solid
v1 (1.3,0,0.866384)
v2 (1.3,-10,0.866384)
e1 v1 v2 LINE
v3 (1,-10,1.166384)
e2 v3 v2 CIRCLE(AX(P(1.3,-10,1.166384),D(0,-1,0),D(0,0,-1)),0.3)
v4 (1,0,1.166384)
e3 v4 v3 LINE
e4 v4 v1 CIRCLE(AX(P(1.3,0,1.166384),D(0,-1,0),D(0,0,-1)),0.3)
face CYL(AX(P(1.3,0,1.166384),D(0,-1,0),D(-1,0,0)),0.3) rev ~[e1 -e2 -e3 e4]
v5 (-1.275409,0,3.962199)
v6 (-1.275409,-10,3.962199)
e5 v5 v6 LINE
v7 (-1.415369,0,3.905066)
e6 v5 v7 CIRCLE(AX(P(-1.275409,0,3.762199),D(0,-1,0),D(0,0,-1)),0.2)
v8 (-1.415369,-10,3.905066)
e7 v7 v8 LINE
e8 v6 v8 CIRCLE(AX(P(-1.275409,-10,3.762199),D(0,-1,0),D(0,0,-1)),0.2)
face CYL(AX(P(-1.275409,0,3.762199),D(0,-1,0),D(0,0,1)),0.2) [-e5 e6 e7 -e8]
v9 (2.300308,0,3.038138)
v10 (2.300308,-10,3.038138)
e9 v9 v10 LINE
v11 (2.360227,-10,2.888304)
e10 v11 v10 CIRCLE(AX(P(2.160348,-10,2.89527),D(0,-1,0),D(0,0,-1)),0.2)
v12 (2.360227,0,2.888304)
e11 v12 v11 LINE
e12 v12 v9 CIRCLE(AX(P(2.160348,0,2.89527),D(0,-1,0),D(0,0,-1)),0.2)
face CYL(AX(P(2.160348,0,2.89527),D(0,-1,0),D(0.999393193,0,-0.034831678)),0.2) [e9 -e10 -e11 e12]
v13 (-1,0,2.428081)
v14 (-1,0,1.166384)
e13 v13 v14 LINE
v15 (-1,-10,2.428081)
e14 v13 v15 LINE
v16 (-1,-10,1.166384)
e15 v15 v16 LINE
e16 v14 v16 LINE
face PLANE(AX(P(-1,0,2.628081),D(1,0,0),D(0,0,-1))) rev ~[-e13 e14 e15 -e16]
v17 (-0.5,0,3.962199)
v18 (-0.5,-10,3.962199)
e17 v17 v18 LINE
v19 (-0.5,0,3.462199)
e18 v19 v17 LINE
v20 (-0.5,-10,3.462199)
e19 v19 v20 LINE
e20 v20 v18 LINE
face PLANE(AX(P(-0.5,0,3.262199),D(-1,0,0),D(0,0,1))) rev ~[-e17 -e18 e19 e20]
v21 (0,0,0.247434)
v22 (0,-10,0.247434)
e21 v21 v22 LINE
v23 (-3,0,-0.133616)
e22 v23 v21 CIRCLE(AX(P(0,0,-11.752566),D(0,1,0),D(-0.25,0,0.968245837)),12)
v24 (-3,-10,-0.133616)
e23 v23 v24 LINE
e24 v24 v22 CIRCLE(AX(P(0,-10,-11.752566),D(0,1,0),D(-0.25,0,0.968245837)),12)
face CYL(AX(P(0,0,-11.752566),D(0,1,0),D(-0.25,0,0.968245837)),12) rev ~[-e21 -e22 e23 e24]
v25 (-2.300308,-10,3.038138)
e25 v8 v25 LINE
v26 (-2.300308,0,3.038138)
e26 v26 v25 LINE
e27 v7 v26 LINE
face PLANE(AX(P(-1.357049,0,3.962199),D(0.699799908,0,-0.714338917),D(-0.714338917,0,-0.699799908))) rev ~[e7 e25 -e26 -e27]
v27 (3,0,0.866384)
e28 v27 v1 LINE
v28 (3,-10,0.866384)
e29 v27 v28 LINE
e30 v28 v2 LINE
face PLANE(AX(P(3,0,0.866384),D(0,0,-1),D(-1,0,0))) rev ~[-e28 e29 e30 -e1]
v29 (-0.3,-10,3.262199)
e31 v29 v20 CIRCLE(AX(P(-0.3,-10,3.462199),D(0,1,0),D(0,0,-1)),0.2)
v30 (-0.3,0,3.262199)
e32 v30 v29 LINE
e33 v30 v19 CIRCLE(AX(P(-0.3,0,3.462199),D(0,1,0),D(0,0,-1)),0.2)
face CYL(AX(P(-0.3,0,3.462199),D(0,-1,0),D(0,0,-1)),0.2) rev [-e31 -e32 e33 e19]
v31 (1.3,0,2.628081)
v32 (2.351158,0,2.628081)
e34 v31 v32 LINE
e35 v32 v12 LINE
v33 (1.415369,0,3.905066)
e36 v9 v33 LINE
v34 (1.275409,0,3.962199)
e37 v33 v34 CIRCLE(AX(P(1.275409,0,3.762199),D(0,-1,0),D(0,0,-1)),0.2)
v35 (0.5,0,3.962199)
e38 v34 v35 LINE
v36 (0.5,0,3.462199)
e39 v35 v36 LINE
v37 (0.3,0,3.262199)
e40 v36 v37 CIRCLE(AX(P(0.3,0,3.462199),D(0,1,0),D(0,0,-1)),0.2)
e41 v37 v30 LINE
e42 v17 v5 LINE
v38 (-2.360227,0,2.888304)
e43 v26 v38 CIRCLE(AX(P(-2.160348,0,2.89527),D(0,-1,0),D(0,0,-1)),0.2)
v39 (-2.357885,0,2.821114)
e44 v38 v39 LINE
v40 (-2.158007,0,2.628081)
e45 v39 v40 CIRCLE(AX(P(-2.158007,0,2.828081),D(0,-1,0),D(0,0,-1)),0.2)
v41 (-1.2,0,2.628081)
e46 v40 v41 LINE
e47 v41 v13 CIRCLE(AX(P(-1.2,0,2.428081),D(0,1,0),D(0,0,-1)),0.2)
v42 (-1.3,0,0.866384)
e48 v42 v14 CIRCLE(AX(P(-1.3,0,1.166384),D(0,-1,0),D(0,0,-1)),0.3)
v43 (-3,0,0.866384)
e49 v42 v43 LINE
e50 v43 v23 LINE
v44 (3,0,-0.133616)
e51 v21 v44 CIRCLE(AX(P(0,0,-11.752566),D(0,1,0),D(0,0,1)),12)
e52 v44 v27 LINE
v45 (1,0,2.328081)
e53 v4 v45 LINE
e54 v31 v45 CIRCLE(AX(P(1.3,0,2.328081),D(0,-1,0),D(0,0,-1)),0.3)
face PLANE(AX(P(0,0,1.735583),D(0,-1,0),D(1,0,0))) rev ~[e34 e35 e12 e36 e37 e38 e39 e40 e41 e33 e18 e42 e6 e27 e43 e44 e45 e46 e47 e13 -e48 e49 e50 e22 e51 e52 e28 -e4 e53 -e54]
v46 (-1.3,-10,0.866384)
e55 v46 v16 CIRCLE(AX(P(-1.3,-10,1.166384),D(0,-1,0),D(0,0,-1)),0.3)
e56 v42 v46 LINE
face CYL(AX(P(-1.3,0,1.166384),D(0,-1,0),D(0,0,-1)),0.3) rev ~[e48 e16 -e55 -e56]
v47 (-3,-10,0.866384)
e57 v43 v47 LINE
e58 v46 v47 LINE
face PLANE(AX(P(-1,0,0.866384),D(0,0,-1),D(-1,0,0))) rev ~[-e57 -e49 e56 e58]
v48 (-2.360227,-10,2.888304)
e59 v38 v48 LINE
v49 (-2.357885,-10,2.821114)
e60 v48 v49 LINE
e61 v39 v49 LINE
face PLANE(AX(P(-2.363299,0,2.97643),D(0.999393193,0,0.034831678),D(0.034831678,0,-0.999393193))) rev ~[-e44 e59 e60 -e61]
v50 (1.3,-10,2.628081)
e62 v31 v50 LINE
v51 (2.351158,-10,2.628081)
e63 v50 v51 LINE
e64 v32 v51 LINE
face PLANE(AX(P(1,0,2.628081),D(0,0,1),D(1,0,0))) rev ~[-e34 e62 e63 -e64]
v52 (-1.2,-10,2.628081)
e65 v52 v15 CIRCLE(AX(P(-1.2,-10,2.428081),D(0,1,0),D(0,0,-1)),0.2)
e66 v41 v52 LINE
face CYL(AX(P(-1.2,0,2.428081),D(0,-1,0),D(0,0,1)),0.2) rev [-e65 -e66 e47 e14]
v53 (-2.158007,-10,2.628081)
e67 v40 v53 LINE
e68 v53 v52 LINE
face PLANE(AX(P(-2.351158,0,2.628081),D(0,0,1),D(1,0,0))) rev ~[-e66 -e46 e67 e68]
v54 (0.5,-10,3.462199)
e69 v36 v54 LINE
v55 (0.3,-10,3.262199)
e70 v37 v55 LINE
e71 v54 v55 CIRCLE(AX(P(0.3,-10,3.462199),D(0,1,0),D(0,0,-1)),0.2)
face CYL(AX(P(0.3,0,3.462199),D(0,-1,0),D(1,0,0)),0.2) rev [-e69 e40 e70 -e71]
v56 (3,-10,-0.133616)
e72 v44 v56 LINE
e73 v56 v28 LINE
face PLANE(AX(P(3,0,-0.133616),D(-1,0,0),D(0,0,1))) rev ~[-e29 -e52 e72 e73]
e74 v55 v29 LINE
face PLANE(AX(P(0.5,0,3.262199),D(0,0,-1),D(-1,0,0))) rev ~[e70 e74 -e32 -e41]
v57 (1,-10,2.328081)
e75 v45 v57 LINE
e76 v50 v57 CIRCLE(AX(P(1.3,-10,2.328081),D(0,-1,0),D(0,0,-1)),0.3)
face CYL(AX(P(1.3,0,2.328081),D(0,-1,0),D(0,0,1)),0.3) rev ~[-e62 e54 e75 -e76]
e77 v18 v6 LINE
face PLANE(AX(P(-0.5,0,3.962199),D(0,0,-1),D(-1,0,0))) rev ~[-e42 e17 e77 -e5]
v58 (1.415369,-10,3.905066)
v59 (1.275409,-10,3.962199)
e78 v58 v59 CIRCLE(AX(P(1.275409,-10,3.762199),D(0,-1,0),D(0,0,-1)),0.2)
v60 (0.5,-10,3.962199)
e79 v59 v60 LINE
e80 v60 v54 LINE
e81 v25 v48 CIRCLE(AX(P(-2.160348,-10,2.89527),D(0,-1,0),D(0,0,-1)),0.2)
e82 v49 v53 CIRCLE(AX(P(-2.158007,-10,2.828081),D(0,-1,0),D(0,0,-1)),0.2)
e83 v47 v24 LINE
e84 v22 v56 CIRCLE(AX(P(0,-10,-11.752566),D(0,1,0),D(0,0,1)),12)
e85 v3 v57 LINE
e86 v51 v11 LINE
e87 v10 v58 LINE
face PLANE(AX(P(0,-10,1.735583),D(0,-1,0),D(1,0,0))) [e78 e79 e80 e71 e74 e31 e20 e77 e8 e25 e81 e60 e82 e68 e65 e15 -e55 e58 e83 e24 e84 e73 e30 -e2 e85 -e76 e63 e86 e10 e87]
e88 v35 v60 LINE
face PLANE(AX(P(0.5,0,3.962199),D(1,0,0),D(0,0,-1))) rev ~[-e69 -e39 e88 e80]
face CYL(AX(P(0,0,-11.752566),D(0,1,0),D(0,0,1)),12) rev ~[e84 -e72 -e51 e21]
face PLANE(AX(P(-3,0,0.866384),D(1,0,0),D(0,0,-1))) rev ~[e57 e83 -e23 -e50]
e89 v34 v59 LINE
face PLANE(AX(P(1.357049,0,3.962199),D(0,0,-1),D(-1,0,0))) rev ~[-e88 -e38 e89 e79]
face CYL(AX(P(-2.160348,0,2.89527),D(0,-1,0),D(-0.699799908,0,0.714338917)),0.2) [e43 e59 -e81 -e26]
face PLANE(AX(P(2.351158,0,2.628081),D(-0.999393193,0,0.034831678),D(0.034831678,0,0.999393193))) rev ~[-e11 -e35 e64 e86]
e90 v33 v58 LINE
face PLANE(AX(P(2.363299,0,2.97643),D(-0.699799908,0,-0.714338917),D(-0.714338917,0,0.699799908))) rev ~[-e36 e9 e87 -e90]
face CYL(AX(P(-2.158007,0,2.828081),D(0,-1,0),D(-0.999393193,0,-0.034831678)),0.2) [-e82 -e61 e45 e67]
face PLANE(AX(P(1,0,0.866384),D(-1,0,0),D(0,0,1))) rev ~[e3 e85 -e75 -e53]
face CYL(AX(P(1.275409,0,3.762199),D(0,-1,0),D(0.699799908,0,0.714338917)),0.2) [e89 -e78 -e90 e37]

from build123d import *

# Parameters (mm, degrees)
F1_DEPTH = 10
F2_R     = 0.2
F3_R     = 0.3


# Not quite as in the source:
# - a feature names something its author has since deleted; it is built from what else it names


with BuildPart() as f1:
    # F0 (on Front) → F1 (new body)
    with BuildSketch(Plane.XZ):
        with BuildLine():
            Line((-3, 0.8663841993), (-3, -0.1336158007))
            ThreePointArc((-3, -0.1336158007), (-1.5120515098, 0.1517905158), (0, 0.2474341606))
            ThreePointArc((0, 0.2474341606), (1.5120515098, 0.1517905158), (3, -0.1336158007))
            Line((3, -0.1336158007), (3, 0.8663841993))
            Line((3, 0.8663841993), (1, 0.8663841993))
            Line((1, 0.8663841993), (1, 2.6280805469))
            Line((1, 2.6280805469), (2.3511576001, 2.6280805469))
            Line((2.3511576001, 2.6280805469), (2.363298554, 2.9764297366))
            Line((2.363298554, 2.9764297366), (1.357049332, 3.9621986704))
            Line((1.357049332, 3.9621986704), (0.5, 3.9621986704))
            Line((0.5, 3.9621986704), (0.5, 3.2621986704))
            Line((0.5, 3.2621986704), (0, 3.2621986704))
            Line((0, 3.2621986704), (-0.5, 3.2621986704))
            Line((-0.5, 3.2621986704), (-0.5, 3.9621986704))
            Line((-0.5, 3.9621986704), (-1.357049332, 3.9621986704))
            Line((-1.357049332, 3.9621986704), (-2.363298554, 2.9764297366))
            Line((-2.363298554, 2.9764297366), (-2.3511576001, 2.6280805469))
            Line((-2.3511576001, 2.6280805469), (-1, 2.6280805469))
            Line((-1, 2.6280805469), (-1, 0.8663841993))
            Line((-1, 0.8663841993), (-3, 0.8663841993))
        make_face()
    extrude(amount=F1_DEPTH)

    # F2
    f2_edges = [f1.edges().sort_by_distance(p)[0] for p in [
        (-0.5, -5, 3.262199),
        (0.5, -5, 3.262199),
        (2.363299, -5, 2.97643),
        (1.357049, -5, 3.962199),
        (-1, -5, 2.628081),
        (-2.351158, -5, 2.628081),
        (-2.363299, -5, 2.97643),
        (-1.357049, -5, 3.962199),
    ]]
    fillet(f2_edges, radius=F2_R)

    # F3
    f3_edges = [f1.edges().sort_by_distance(p)[0] for p in [
        (-1, -5, 0.866384),
        (1, -5, 0.866384),
        (1, -5, 2.628081),
    ]]
    fillet(f3_edges, radius=F3_R)


solid = f1.part
